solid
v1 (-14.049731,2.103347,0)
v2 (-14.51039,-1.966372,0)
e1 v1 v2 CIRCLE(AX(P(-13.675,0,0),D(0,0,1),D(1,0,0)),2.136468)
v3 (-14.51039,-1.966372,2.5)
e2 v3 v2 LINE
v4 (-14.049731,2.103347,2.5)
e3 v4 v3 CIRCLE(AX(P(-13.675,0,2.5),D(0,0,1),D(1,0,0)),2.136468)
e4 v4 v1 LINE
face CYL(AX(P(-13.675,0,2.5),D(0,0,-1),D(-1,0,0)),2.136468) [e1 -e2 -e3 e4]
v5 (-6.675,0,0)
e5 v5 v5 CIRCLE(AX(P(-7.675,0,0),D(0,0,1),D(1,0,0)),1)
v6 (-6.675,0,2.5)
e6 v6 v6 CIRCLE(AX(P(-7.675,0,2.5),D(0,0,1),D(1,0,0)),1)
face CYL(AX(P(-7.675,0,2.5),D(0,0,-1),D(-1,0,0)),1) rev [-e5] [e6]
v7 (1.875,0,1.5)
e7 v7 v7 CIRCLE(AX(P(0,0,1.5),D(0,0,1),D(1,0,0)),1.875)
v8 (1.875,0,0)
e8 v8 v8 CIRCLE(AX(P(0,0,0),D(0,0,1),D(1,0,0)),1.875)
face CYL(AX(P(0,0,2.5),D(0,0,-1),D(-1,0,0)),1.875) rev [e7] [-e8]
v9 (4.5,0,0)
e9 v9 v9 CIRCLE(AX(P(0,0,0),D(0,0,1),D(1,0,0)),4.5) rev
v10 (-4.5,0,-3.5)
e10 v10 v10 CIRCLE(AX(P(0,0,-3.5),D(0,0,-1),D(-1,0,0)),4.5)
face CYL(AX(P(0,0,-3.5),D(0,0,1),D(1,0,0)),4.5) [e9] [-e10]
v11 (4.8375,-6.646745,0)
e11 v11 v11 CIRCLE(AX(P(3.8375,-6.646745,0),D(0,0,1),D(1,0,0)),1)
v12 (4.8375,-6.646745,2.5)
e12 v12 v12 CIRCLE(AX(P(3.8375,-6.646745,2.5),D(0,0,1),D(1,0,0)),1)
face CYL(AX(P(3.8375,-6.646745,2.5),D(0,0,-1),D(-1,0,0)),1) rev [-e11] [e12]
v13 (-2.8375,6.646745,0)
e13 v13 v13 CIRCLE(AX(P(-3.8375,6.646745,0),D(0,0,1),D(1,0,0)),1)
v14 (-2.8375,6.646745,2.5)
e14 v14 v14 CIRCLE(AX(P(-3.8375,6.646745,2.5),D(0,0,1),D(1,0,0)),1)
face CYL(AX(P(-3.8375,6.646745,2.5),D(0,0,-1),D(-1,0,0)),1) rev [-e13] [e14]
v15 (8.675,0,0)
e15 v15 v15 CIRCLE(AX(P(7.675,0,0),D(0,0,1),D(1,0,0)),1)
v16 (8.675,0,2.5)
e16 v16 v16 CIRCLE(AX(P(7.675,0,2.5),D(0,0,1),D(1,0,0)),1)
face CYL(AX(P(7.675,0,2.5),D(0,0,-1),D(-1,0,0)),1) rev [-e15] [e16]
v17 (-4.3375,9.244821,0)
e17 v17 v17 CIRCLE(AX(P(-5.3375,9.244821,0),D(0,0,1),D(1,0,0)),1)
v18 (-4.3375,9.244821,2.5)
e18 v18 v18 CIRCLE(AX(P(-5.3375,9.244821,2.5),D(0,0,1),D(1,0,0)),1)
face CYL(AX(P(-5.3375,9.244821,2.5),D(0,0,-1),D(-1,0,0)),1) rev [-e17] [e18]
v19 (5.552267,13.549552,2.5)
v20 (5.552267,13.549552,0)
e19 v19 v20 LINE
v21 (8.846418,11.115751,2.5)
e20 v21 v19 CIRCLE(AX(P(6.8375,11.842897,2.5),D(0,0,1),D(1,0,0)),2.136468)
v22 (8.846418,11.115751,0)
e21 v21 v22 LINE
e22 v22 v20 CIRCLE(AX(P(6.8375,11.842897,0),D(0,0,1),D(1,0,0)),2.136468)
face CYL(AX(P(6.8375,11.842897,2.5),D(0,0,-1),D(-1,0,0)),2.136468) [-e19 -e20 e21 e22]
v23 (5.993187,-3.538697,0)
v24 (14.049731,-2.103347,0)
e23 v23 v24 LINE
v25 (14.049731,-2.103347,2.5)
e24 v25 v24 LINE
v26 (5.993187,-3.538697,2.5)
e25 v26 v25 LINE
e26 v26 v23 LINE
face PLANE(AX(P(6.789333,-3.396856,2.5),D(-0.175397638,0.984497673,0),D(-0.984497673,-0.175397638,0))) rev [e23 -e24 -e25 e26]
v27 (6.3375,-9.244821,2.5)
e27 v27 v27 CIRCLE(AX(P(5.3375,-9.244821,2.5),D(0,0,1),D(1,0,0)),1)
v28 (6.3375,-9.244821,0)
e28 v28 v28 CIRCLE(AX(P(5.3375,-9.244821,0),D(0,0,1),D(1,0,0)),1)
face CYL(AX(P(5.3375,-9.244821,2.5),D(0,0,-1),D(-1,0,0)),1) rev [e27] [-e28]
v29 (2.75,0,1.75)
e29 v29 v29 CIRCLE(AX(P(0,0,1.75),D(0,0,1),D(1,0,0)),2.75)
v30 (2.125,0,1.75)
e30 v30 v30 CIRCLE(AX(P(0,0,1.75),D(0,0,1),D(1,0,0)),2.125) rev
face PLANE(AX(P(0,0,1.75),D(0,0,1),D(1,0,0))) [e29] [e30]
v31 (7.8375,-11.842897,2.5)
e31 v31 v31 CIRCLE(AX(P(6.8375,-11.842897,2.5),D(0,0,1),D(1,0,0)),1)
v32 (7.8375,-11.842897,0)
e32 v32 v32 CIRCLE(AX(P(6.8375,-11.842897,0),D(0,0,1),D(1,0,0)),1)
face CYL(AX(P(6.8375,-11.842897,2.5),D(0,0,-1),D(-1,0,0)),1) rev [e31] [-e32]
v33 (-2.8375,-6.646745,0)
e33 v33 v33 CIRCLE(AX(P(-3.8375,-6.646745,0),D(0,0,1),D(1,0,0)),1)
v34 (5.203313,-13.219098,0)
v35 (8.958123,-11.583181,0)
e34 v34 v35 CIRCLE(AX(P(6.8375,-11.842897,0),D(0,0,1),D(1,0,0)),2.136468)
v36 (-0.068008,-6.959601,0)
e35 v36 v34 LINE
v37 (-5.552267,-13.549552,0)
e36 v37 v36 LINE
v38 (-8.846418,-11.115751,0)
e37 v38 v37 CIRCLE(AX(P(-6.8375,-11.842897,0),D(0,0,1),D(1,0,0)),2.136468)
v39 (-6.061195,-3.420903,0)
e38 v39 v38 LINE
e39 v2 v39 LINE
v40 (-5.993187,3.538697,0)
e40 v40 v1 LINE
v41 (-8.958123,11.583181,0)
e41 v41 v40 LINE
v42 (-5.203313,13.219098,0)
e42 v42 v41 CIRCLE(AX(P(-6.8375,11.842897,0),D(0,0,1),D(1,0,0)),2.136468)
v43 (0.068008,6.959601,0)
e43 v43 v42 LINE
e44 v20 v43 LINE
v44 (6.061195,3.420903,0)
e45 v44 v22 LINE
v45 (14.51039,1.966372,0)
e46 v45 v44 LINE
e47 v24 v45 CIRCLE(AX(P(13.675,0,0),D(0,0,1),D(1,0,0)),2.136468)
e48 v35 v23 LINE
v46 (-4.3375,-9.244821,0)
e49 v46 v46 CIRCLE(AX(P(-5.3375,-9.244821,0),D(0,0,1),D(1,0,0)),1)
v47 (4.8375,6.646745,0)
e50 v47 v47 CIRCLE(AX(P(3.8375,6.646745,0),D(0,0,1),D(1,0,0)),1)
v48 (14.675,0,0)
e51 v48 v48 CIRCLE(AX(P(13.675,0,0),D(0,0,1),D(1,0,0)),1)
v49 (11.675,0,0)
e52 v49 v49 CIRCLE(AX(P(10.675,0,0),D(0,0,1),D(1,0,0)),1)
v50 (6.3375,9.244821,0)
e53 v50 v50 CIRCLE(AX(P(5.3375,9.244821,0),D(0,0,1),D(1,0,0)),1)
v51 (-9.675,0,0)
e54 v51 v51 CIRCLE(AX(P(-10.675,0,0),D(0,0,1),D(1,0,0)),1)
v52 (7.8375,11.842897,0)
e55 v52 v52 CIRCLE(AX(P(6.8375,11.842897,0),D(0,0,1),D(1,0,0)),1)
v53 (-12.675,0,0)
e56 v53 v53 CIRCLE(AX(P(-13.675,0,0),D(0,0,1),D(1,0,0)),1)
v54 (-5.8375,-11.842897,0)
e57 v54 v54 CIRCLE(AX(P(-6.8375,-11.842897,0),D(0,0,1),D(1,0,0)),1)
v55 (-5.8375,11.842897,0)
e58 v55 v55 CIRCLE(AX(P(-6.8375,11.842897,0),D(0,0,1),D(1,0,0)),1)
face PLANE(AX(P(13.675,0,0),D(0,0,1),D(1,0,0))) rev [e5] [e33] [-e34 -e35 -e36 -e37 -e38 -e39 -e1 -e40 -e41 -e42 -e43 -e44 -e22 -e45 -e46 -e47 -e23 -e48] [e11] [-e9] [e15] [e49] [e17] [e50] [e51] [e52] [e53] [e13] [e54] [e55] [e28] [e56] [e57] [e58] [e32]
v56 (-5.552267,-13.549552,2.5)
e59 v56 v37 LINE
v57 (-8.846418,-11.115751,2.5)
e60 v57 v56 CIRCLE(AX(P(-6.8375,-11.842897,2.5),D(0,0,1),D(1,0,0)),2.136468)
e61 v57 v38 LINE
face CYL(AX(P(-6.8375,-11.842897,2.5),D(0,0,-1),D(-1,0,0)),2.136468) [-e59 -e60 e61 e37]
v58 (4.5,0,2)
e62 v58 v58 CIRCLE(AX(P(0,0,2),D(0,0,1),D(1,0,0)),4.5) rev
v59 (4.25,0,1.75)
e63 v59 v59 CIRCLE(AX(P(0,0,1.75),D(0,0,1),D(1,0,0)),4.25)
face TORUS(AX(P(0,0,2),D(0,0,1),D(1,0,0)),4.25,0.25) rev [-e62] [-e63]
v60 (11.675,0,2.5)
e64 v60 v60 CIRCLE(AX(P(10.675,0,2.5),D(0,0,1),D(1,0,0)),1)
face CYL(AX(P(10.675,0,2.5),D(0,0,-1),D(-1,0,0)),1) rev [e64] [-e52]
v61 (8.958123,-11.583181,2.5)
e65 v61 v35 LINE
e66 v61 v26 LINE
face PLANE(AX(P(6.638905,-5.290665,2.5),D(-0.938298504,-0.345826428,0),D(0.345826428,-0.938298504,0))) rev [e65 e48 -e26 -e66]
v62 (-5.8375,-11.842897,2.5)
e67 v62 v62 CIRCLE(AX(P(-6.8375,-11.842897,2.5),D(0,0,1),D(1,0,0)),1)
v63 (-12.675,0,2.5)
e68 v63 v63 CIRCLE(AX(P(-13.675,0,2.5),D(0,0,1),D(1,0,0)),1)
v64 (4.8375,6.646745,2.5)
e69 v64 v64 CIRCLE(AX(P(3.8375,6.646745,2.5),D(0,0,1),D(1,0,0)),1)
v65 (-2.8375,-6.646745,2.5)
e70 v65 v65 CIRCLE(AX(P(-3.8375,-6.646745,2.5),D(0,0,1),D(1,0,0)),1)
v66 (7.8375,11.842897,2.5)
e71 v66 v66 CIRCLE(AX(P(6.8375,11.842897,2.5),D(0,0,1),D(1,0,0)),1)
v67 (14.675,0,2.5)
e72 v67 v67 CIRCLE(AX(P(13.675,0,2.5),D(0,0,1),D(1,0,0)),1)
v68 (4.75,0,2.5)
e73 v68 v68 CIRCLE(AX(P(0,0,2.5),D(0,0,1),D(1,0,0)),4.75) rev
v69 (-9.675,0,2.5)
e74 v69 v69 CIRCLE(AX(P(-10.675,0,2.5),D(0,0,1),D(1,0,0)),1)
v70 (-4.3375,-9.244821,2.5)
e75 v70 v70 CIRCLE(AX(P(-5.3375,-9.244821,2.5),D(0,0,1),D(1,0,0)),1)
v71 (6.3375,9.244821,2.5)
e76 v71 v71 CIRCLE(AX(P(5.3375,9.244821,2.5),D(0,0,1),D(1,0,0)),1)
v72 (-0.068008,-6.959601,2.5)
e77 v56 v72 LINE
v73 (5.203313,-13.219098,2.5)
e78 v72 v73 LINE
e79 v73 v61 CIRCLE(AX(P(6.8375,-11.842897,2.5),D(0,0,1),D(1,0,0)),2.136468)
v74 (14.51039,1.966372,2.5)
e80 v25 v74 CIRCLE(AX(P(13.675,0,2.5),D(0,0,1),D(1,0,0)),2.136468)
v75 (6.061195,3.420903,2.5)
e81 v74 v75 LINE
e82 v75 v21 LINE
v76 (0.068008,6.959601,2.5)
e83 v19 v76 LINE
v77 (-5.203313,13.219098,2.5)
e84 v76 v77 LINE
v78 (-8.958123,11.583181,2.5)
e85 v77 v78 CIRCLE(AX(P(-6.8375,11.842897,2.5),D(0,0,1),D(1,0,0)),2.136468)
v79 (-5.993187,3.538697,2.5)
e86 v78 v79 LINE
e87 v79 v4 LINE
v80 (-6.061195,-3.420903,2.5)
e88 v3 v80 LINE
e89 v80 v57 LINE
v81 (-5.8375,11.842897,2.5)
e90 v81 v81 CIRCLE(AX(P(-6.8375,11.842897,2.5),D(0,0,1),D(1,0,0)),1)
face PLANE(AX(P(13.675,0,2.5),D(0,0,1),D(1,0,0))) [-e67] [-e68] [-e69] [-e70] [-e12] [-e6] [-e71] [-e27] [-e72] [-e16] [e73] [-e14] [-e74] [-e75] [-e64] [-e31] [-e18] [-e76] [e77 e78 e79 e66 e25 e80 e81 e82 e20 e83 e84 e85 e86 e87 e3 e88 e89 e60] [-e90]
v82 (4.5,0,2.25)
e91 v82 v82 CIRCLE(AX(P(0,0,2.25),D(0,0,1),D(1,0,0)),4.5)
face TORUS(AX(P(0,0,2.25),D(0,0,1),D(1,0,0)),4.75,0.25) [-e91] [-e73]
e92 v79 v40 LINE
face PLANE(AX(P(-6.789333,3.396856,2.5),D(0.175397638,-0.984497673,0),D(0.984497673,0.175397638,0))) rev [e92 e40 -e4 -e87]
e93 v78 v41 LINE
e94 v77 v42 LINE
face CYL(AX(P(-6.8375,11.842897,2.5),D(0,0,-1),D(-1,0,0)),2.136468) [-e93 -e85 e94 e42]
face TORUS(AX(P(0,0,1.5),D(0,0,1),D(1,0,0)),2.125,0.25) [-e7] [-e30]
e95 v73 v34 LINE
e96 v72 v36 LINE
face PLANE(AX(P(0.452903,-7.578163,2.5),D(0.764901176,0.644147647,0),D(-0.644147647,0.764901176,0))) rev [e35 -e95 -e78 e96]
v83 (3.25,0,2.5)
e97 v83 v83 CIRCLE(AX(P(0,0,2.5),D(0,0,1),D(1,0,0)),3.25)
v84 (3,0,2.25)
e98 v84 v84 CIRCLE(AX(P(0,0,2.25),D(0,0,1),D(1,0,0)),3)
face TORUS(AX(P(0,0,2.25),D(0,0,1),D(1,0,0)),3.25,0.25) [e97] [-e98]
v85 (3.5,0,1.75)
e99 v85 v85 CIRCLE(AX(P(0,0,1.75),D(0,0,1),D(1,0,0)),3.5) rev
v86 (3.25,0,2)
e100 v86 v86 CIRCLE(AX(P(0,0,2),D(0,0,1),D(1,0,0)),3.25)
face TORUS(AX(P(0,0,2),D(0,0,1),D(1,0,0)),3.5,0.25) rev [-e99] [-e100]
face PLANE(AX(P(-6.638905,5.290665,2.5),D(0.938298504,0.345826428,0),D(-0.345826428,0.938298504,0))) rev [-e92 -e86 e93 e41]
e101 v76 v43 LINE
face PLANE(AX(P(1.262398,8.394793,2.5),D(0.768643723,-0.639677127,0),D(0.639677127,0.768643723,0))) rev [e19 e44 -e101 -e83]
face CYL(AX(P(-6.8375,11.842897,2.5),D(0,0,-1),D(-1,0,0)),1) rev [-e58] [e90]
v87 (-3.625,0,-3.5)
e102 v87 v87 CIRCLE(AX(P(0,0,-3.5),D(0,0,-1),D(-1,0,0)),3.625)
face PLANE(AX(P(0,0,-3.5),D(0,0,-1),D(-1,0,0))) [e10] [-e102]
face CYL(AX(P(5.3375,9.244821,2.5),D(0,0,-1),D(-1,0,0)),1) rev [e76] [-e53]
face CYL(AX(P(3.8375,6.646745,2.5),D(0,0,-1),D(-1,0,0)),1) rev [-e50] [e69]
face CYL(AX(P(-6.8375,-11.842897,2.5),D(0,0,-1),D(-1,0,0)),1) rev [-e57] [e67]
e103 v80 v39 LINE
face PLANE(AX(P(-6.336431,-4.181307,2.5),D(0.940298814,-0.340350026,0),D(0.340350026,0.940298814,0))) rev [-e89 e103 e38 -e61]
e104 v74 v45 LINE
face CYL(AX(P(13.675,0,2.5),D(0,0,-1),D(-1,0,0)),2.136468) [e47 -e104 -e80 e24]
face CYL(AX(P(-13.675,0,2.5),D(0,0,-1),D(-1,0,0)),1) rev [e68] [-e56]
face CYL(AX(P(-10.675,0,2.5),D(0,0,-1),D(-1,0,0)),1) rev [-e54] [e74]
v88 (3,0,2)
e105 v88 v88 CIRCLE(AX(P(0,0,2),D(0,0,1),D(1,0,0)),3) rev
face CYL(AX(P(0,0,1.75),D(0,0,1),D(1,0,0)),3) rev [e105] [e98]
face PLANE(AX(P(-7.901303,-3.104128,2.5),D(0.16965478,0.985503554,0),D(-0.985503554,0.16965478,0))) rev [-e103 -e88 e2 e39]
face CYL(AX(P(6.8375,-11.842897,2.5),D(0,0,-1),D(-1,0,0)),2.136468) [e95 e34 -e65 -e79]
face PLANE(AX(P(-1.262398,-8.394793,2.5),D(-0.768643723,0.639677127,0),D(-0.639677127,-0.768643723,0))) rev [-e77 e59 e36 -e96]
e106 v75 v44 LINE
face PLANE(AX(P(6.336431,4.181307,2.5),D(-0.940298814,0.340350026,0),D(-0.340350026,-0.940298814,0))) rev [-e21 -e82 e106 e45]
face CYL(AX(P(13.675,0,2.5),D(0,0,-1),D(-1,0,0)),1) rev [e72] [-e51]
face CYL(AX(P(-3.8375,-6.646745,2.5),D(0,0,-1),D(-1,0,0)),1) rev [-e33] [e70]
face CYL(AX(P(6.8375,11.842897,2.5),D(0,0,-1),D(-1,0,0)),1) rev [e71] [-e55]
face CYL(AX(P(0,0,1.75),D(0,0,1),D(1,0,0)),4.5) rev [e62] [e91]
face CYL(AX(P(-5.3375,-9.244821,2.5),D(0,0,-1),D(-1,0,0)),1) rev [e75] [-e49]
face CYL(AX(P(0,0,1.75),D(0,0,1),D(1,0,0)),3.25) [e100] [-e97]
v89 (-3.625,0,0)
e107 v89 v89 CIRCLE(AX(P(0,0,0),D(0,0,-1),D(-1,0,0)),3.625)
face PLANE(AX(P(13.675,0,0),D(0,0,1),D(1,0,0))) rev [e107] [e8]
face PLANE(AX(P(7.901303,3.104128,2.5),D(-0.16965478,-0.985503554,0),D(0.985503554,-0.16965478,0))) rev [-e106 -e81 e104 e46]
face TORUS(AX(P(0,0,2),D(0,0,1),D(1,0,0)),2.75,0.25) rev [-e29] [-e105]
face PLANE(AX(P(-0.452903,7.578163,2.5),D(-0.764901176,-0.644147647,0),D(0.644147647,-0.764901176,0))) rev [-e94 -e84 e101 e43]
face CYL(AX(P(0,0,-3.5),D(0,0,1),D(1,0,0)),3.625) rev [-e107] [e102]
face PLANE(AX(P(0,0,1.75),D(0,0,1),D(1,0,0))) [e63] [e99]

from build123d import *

# Parameters (mm, degrees)
SKETCH1_R           = 1
SKETCH1_R_2         = 1.875
BOSS_EXTRUDE1_DEPTH = 2.5
CUT_EXTRUDE1_START  = -0.75
SKETCH2_R           = 4.5
SKETCH2_R_2         = 3.25
SKETCH2_R_3         = 3
SKETCH2_R_4         = 1.875
CUT_EXTRUDE1_DEPTH  = 0.75
FILLET2_R           = 0.25
BOSS_EXTRUDE2_START = 3.5
SKETCH3_R           = 4.5
SKETCH3_R_2         = 3.625
BOSS_EXTRUDE2_DEPTH = 3.5


with BuildPart() as part:
    # Sketch1 → Boss-Extrude1 (new body)
    with BuildSketch(Plane.XY):
        with BuildLine():
            Line((7.901303318, 3.104128113), (14.510390044, 1.96637153))
            ThreePointArc((14.510390044, 1.96637153), (15.797911049, -0.240296062), (14.049731359, -2.103347315))
            Line((14.049731359, -2.103347315), (6.789333322, -3.396856383))
            Line((6.789333322, -3.396856383), (5.993186864, -3.538697458))
            Line((5.993186864, -3.538697458), (6.638905462, -5.29066534))
            Line((6.638905462, -5.29066534), (8.95812272, -11.583180632))
            ThreePointArc((8.95812272, -11.583180632), (7.69085303, -13.801540326), (5.203313472, -13.219097931))
            Line((5.203313472, -13.219097931), (0.45290274, -7.578163323))
            Line((0.45290274, -7.578163323), (-0.068008463, -6.959600803))
            Line((-0.068008463, -6.959600803), (-1.262397857, -8.394793453))
            Line((-1.262397857, -8.394793453), (-5.552267324, -13.549552162))
            ThreePointArc((-5.552267324, -13.549552162), (-8.107058019, -13.561244264), (-8.846417887, -11.115750616))
            Line((-8.846417887, -11.115750616), (-6.336430581, -4.18130694))
            Line((-6.336430581, -4.18130694), (-6.061195327, -3.420903345))
            Line((-6.061195327, -3.420903345), (-7.901303318, -3.104128113))
            Line((-7.901303318, -3.104128113), (-14.510390044, -1.96637153))
            ThreePointArc((-14.510390044, -1.96637153), (-15.797911049, 0.240296062), (-14.049731359, 2.103347315))
            Line((-14.049731359, 2.103347315), (-6.789333322, 3.396856383))
            Line((-6.789333322, 3.396856383), (-5.993186864, 3.538697458))
            Line((-5.993186864, 3.538697458), (-6.638905462, 5.29066534))
            Line((-6.638905462, 5.29066534), (-8.95812272, 11.583180632))
            ThreePointArc((-8.95812272, 11.583180632), (-7.69085303, 13.801540326), (-5.203313472, 13.219097931))
            Line((-5.203313472, 13.219097931), (-0.45290274, 7.578163323))
            Line((-0.45290274, 7.578163323), (0.068008463, 6.959600803))
            Line((0.068008463, 6.959600803), (1.262397857, 8.394793453))
            Line((1.262397857, 8.394793453), (5.552267324, 13.549552162))
            ThreePointArc((5.552267324, 13.549552162), (8.107058019, 13.561244264), (8.846417887, 11.115750616))
            Line((8.846417887, 11.115750616), (6.336430581, 4.18130694))
            Line((6.336430581, 4.18130694), (6.061195327, 3.420903345))
            Line((6.061195327, 3.420903345), (7.901303318, 3.104128113))
        make_face()
        with Locations((7.675, 0)):
            Circle(SKETCH1_R, mode=Mode.SUBTRACT)
        with Locations((10.675, 0)):
            Circle(SKETCH1_R, mode=Mode.SUBTRACT)
        with Locations((13.675, 0)):
            Circle(SKETCH1_R, mode=Mode.SUBTRACT)
        with Locations((3.8375, -6.646744974)):
            Circle(SKETCH1_R, mode=Mode.SUBTRACT)
        with Locations((5.3375, -9.244821185)):
            Circle(SKETCH1_R, mode=Mode.SUBTRACT)
        with Locations((6.8375, -11.842897397)):
            Circle(SKETCH1_R, mode=Mode.SUBTRACT)
        with Locations((-3.8375, -6.646744974)):
            Circle(SKETCH1_R, mode=Mode.SUBTRACT)
        with Locations((-5.3375, -9.244821185)):
            Circle(SKETCH1_R, mode=Mode.SUBTRACT)
        with Locations((-6.8375, -11.842897397)):
            Circle(SKETCH1_R, mode=Mode.SUBTRACT)
        with Locations((-7.675, 0)):
            Circle(SKETCH1_R, mode=Mode.SUBTRACT)
        with Locations((-10.675, 0)):
            Circle(SKETCH1_R, mode=Mode.SUBTRACT)
        with Locations((-13.675, 0)):
            Circle(SKETCH1_R, mode=Mode.SUBTRACT)
        with Locations((-3.8375, 6.646744974)):
            Circle(SKETCH1_R, mode=Mode.SUBTRACT)
        with Locations((-5.3375, 9.244821185)):
            Circle(SKETCH1_R, mode=Mode.SUBTRACT)
        with Locations((-6.8375, 11.842897397)):
            Circle(SKETCH1_R, mode=Mode.SUBTRACT)
        with Locations((3.8375, 6.646744974)):
            Circle(SKETCH1_R, mode=Mode.SUBTRACT)
        with Locations((5.3375, 9.244821185)):
            Circle(SKETCH1_R, mode=Mode.SUBTRACT)
        with Locations((6.8375, 11.842897397)):
            Circle(SKETCH1_R, mode=Mode.SUBTRACT)
        Circle(SKETCH1_R_2, mode=Mode.SUBTRACT)
    extrude(amount=BOSS_EXTRUDE1_DEPTH)

    # Sketch2 → Cut-Extrude1 (cut)
    # profile 1 of 2: a face of its own
    with BuildSketch(Plane.XY.offset(2.5).offset(CUT_EXTRUDE1_START)):
        Circle(SKETCH2_R)
        Circle(SKETCH2_R_2, mode=Mode.SUBTRACT)
    # profile 2 of 2: a face of its own
    with BuildSketch(Plane.XY.offset(2.5).offset(CUT_EXTRUDE1_START)):
        Circle(SKETCH2_R_3)
        Circle(SKETCH2_R_4, mode=Mode.SUBTRACT)
    extrude(amount=CUT_EXTRUDE1_DEPTH, mode=Mode.SUBTRACT)

    # Fillet2
    fillet2_edges = [part.edges().sort_by_distance(p)[0] for p in [
        (-1.875, 0, 1.75),
        (-3, 0, 1.75),
        (-3, 0, 2.5),
        (-4.5, 0, 1.75),
        (-3.25, 0, 1.75),
        (-4.5, 0, 2.5),
    ]]
    fillet(fillet2_edges, radius=FILLET2_R - 0.0001)  # a hair under: the kernel refuses the full size

    # Sketch3 → Boss-Extrude2 (add)
    with BuildSketch(Plane(origin=(0, 0, 0), x_dir=(-1, 0, 0), z_dir=(0, 0, -1)).offset(BOSS_EXTRUDE2_START)):
        with Locations(Location((0, 0, 0), (0, 0, 180))):
            Circle(SKETCH3_R)
        Circle(SKETCH3_R_2, mode=Mode.SUBTRACT)
    extrude(amount=-BOSS_EXTRUDE2_DEPTH)


solid = part.part
